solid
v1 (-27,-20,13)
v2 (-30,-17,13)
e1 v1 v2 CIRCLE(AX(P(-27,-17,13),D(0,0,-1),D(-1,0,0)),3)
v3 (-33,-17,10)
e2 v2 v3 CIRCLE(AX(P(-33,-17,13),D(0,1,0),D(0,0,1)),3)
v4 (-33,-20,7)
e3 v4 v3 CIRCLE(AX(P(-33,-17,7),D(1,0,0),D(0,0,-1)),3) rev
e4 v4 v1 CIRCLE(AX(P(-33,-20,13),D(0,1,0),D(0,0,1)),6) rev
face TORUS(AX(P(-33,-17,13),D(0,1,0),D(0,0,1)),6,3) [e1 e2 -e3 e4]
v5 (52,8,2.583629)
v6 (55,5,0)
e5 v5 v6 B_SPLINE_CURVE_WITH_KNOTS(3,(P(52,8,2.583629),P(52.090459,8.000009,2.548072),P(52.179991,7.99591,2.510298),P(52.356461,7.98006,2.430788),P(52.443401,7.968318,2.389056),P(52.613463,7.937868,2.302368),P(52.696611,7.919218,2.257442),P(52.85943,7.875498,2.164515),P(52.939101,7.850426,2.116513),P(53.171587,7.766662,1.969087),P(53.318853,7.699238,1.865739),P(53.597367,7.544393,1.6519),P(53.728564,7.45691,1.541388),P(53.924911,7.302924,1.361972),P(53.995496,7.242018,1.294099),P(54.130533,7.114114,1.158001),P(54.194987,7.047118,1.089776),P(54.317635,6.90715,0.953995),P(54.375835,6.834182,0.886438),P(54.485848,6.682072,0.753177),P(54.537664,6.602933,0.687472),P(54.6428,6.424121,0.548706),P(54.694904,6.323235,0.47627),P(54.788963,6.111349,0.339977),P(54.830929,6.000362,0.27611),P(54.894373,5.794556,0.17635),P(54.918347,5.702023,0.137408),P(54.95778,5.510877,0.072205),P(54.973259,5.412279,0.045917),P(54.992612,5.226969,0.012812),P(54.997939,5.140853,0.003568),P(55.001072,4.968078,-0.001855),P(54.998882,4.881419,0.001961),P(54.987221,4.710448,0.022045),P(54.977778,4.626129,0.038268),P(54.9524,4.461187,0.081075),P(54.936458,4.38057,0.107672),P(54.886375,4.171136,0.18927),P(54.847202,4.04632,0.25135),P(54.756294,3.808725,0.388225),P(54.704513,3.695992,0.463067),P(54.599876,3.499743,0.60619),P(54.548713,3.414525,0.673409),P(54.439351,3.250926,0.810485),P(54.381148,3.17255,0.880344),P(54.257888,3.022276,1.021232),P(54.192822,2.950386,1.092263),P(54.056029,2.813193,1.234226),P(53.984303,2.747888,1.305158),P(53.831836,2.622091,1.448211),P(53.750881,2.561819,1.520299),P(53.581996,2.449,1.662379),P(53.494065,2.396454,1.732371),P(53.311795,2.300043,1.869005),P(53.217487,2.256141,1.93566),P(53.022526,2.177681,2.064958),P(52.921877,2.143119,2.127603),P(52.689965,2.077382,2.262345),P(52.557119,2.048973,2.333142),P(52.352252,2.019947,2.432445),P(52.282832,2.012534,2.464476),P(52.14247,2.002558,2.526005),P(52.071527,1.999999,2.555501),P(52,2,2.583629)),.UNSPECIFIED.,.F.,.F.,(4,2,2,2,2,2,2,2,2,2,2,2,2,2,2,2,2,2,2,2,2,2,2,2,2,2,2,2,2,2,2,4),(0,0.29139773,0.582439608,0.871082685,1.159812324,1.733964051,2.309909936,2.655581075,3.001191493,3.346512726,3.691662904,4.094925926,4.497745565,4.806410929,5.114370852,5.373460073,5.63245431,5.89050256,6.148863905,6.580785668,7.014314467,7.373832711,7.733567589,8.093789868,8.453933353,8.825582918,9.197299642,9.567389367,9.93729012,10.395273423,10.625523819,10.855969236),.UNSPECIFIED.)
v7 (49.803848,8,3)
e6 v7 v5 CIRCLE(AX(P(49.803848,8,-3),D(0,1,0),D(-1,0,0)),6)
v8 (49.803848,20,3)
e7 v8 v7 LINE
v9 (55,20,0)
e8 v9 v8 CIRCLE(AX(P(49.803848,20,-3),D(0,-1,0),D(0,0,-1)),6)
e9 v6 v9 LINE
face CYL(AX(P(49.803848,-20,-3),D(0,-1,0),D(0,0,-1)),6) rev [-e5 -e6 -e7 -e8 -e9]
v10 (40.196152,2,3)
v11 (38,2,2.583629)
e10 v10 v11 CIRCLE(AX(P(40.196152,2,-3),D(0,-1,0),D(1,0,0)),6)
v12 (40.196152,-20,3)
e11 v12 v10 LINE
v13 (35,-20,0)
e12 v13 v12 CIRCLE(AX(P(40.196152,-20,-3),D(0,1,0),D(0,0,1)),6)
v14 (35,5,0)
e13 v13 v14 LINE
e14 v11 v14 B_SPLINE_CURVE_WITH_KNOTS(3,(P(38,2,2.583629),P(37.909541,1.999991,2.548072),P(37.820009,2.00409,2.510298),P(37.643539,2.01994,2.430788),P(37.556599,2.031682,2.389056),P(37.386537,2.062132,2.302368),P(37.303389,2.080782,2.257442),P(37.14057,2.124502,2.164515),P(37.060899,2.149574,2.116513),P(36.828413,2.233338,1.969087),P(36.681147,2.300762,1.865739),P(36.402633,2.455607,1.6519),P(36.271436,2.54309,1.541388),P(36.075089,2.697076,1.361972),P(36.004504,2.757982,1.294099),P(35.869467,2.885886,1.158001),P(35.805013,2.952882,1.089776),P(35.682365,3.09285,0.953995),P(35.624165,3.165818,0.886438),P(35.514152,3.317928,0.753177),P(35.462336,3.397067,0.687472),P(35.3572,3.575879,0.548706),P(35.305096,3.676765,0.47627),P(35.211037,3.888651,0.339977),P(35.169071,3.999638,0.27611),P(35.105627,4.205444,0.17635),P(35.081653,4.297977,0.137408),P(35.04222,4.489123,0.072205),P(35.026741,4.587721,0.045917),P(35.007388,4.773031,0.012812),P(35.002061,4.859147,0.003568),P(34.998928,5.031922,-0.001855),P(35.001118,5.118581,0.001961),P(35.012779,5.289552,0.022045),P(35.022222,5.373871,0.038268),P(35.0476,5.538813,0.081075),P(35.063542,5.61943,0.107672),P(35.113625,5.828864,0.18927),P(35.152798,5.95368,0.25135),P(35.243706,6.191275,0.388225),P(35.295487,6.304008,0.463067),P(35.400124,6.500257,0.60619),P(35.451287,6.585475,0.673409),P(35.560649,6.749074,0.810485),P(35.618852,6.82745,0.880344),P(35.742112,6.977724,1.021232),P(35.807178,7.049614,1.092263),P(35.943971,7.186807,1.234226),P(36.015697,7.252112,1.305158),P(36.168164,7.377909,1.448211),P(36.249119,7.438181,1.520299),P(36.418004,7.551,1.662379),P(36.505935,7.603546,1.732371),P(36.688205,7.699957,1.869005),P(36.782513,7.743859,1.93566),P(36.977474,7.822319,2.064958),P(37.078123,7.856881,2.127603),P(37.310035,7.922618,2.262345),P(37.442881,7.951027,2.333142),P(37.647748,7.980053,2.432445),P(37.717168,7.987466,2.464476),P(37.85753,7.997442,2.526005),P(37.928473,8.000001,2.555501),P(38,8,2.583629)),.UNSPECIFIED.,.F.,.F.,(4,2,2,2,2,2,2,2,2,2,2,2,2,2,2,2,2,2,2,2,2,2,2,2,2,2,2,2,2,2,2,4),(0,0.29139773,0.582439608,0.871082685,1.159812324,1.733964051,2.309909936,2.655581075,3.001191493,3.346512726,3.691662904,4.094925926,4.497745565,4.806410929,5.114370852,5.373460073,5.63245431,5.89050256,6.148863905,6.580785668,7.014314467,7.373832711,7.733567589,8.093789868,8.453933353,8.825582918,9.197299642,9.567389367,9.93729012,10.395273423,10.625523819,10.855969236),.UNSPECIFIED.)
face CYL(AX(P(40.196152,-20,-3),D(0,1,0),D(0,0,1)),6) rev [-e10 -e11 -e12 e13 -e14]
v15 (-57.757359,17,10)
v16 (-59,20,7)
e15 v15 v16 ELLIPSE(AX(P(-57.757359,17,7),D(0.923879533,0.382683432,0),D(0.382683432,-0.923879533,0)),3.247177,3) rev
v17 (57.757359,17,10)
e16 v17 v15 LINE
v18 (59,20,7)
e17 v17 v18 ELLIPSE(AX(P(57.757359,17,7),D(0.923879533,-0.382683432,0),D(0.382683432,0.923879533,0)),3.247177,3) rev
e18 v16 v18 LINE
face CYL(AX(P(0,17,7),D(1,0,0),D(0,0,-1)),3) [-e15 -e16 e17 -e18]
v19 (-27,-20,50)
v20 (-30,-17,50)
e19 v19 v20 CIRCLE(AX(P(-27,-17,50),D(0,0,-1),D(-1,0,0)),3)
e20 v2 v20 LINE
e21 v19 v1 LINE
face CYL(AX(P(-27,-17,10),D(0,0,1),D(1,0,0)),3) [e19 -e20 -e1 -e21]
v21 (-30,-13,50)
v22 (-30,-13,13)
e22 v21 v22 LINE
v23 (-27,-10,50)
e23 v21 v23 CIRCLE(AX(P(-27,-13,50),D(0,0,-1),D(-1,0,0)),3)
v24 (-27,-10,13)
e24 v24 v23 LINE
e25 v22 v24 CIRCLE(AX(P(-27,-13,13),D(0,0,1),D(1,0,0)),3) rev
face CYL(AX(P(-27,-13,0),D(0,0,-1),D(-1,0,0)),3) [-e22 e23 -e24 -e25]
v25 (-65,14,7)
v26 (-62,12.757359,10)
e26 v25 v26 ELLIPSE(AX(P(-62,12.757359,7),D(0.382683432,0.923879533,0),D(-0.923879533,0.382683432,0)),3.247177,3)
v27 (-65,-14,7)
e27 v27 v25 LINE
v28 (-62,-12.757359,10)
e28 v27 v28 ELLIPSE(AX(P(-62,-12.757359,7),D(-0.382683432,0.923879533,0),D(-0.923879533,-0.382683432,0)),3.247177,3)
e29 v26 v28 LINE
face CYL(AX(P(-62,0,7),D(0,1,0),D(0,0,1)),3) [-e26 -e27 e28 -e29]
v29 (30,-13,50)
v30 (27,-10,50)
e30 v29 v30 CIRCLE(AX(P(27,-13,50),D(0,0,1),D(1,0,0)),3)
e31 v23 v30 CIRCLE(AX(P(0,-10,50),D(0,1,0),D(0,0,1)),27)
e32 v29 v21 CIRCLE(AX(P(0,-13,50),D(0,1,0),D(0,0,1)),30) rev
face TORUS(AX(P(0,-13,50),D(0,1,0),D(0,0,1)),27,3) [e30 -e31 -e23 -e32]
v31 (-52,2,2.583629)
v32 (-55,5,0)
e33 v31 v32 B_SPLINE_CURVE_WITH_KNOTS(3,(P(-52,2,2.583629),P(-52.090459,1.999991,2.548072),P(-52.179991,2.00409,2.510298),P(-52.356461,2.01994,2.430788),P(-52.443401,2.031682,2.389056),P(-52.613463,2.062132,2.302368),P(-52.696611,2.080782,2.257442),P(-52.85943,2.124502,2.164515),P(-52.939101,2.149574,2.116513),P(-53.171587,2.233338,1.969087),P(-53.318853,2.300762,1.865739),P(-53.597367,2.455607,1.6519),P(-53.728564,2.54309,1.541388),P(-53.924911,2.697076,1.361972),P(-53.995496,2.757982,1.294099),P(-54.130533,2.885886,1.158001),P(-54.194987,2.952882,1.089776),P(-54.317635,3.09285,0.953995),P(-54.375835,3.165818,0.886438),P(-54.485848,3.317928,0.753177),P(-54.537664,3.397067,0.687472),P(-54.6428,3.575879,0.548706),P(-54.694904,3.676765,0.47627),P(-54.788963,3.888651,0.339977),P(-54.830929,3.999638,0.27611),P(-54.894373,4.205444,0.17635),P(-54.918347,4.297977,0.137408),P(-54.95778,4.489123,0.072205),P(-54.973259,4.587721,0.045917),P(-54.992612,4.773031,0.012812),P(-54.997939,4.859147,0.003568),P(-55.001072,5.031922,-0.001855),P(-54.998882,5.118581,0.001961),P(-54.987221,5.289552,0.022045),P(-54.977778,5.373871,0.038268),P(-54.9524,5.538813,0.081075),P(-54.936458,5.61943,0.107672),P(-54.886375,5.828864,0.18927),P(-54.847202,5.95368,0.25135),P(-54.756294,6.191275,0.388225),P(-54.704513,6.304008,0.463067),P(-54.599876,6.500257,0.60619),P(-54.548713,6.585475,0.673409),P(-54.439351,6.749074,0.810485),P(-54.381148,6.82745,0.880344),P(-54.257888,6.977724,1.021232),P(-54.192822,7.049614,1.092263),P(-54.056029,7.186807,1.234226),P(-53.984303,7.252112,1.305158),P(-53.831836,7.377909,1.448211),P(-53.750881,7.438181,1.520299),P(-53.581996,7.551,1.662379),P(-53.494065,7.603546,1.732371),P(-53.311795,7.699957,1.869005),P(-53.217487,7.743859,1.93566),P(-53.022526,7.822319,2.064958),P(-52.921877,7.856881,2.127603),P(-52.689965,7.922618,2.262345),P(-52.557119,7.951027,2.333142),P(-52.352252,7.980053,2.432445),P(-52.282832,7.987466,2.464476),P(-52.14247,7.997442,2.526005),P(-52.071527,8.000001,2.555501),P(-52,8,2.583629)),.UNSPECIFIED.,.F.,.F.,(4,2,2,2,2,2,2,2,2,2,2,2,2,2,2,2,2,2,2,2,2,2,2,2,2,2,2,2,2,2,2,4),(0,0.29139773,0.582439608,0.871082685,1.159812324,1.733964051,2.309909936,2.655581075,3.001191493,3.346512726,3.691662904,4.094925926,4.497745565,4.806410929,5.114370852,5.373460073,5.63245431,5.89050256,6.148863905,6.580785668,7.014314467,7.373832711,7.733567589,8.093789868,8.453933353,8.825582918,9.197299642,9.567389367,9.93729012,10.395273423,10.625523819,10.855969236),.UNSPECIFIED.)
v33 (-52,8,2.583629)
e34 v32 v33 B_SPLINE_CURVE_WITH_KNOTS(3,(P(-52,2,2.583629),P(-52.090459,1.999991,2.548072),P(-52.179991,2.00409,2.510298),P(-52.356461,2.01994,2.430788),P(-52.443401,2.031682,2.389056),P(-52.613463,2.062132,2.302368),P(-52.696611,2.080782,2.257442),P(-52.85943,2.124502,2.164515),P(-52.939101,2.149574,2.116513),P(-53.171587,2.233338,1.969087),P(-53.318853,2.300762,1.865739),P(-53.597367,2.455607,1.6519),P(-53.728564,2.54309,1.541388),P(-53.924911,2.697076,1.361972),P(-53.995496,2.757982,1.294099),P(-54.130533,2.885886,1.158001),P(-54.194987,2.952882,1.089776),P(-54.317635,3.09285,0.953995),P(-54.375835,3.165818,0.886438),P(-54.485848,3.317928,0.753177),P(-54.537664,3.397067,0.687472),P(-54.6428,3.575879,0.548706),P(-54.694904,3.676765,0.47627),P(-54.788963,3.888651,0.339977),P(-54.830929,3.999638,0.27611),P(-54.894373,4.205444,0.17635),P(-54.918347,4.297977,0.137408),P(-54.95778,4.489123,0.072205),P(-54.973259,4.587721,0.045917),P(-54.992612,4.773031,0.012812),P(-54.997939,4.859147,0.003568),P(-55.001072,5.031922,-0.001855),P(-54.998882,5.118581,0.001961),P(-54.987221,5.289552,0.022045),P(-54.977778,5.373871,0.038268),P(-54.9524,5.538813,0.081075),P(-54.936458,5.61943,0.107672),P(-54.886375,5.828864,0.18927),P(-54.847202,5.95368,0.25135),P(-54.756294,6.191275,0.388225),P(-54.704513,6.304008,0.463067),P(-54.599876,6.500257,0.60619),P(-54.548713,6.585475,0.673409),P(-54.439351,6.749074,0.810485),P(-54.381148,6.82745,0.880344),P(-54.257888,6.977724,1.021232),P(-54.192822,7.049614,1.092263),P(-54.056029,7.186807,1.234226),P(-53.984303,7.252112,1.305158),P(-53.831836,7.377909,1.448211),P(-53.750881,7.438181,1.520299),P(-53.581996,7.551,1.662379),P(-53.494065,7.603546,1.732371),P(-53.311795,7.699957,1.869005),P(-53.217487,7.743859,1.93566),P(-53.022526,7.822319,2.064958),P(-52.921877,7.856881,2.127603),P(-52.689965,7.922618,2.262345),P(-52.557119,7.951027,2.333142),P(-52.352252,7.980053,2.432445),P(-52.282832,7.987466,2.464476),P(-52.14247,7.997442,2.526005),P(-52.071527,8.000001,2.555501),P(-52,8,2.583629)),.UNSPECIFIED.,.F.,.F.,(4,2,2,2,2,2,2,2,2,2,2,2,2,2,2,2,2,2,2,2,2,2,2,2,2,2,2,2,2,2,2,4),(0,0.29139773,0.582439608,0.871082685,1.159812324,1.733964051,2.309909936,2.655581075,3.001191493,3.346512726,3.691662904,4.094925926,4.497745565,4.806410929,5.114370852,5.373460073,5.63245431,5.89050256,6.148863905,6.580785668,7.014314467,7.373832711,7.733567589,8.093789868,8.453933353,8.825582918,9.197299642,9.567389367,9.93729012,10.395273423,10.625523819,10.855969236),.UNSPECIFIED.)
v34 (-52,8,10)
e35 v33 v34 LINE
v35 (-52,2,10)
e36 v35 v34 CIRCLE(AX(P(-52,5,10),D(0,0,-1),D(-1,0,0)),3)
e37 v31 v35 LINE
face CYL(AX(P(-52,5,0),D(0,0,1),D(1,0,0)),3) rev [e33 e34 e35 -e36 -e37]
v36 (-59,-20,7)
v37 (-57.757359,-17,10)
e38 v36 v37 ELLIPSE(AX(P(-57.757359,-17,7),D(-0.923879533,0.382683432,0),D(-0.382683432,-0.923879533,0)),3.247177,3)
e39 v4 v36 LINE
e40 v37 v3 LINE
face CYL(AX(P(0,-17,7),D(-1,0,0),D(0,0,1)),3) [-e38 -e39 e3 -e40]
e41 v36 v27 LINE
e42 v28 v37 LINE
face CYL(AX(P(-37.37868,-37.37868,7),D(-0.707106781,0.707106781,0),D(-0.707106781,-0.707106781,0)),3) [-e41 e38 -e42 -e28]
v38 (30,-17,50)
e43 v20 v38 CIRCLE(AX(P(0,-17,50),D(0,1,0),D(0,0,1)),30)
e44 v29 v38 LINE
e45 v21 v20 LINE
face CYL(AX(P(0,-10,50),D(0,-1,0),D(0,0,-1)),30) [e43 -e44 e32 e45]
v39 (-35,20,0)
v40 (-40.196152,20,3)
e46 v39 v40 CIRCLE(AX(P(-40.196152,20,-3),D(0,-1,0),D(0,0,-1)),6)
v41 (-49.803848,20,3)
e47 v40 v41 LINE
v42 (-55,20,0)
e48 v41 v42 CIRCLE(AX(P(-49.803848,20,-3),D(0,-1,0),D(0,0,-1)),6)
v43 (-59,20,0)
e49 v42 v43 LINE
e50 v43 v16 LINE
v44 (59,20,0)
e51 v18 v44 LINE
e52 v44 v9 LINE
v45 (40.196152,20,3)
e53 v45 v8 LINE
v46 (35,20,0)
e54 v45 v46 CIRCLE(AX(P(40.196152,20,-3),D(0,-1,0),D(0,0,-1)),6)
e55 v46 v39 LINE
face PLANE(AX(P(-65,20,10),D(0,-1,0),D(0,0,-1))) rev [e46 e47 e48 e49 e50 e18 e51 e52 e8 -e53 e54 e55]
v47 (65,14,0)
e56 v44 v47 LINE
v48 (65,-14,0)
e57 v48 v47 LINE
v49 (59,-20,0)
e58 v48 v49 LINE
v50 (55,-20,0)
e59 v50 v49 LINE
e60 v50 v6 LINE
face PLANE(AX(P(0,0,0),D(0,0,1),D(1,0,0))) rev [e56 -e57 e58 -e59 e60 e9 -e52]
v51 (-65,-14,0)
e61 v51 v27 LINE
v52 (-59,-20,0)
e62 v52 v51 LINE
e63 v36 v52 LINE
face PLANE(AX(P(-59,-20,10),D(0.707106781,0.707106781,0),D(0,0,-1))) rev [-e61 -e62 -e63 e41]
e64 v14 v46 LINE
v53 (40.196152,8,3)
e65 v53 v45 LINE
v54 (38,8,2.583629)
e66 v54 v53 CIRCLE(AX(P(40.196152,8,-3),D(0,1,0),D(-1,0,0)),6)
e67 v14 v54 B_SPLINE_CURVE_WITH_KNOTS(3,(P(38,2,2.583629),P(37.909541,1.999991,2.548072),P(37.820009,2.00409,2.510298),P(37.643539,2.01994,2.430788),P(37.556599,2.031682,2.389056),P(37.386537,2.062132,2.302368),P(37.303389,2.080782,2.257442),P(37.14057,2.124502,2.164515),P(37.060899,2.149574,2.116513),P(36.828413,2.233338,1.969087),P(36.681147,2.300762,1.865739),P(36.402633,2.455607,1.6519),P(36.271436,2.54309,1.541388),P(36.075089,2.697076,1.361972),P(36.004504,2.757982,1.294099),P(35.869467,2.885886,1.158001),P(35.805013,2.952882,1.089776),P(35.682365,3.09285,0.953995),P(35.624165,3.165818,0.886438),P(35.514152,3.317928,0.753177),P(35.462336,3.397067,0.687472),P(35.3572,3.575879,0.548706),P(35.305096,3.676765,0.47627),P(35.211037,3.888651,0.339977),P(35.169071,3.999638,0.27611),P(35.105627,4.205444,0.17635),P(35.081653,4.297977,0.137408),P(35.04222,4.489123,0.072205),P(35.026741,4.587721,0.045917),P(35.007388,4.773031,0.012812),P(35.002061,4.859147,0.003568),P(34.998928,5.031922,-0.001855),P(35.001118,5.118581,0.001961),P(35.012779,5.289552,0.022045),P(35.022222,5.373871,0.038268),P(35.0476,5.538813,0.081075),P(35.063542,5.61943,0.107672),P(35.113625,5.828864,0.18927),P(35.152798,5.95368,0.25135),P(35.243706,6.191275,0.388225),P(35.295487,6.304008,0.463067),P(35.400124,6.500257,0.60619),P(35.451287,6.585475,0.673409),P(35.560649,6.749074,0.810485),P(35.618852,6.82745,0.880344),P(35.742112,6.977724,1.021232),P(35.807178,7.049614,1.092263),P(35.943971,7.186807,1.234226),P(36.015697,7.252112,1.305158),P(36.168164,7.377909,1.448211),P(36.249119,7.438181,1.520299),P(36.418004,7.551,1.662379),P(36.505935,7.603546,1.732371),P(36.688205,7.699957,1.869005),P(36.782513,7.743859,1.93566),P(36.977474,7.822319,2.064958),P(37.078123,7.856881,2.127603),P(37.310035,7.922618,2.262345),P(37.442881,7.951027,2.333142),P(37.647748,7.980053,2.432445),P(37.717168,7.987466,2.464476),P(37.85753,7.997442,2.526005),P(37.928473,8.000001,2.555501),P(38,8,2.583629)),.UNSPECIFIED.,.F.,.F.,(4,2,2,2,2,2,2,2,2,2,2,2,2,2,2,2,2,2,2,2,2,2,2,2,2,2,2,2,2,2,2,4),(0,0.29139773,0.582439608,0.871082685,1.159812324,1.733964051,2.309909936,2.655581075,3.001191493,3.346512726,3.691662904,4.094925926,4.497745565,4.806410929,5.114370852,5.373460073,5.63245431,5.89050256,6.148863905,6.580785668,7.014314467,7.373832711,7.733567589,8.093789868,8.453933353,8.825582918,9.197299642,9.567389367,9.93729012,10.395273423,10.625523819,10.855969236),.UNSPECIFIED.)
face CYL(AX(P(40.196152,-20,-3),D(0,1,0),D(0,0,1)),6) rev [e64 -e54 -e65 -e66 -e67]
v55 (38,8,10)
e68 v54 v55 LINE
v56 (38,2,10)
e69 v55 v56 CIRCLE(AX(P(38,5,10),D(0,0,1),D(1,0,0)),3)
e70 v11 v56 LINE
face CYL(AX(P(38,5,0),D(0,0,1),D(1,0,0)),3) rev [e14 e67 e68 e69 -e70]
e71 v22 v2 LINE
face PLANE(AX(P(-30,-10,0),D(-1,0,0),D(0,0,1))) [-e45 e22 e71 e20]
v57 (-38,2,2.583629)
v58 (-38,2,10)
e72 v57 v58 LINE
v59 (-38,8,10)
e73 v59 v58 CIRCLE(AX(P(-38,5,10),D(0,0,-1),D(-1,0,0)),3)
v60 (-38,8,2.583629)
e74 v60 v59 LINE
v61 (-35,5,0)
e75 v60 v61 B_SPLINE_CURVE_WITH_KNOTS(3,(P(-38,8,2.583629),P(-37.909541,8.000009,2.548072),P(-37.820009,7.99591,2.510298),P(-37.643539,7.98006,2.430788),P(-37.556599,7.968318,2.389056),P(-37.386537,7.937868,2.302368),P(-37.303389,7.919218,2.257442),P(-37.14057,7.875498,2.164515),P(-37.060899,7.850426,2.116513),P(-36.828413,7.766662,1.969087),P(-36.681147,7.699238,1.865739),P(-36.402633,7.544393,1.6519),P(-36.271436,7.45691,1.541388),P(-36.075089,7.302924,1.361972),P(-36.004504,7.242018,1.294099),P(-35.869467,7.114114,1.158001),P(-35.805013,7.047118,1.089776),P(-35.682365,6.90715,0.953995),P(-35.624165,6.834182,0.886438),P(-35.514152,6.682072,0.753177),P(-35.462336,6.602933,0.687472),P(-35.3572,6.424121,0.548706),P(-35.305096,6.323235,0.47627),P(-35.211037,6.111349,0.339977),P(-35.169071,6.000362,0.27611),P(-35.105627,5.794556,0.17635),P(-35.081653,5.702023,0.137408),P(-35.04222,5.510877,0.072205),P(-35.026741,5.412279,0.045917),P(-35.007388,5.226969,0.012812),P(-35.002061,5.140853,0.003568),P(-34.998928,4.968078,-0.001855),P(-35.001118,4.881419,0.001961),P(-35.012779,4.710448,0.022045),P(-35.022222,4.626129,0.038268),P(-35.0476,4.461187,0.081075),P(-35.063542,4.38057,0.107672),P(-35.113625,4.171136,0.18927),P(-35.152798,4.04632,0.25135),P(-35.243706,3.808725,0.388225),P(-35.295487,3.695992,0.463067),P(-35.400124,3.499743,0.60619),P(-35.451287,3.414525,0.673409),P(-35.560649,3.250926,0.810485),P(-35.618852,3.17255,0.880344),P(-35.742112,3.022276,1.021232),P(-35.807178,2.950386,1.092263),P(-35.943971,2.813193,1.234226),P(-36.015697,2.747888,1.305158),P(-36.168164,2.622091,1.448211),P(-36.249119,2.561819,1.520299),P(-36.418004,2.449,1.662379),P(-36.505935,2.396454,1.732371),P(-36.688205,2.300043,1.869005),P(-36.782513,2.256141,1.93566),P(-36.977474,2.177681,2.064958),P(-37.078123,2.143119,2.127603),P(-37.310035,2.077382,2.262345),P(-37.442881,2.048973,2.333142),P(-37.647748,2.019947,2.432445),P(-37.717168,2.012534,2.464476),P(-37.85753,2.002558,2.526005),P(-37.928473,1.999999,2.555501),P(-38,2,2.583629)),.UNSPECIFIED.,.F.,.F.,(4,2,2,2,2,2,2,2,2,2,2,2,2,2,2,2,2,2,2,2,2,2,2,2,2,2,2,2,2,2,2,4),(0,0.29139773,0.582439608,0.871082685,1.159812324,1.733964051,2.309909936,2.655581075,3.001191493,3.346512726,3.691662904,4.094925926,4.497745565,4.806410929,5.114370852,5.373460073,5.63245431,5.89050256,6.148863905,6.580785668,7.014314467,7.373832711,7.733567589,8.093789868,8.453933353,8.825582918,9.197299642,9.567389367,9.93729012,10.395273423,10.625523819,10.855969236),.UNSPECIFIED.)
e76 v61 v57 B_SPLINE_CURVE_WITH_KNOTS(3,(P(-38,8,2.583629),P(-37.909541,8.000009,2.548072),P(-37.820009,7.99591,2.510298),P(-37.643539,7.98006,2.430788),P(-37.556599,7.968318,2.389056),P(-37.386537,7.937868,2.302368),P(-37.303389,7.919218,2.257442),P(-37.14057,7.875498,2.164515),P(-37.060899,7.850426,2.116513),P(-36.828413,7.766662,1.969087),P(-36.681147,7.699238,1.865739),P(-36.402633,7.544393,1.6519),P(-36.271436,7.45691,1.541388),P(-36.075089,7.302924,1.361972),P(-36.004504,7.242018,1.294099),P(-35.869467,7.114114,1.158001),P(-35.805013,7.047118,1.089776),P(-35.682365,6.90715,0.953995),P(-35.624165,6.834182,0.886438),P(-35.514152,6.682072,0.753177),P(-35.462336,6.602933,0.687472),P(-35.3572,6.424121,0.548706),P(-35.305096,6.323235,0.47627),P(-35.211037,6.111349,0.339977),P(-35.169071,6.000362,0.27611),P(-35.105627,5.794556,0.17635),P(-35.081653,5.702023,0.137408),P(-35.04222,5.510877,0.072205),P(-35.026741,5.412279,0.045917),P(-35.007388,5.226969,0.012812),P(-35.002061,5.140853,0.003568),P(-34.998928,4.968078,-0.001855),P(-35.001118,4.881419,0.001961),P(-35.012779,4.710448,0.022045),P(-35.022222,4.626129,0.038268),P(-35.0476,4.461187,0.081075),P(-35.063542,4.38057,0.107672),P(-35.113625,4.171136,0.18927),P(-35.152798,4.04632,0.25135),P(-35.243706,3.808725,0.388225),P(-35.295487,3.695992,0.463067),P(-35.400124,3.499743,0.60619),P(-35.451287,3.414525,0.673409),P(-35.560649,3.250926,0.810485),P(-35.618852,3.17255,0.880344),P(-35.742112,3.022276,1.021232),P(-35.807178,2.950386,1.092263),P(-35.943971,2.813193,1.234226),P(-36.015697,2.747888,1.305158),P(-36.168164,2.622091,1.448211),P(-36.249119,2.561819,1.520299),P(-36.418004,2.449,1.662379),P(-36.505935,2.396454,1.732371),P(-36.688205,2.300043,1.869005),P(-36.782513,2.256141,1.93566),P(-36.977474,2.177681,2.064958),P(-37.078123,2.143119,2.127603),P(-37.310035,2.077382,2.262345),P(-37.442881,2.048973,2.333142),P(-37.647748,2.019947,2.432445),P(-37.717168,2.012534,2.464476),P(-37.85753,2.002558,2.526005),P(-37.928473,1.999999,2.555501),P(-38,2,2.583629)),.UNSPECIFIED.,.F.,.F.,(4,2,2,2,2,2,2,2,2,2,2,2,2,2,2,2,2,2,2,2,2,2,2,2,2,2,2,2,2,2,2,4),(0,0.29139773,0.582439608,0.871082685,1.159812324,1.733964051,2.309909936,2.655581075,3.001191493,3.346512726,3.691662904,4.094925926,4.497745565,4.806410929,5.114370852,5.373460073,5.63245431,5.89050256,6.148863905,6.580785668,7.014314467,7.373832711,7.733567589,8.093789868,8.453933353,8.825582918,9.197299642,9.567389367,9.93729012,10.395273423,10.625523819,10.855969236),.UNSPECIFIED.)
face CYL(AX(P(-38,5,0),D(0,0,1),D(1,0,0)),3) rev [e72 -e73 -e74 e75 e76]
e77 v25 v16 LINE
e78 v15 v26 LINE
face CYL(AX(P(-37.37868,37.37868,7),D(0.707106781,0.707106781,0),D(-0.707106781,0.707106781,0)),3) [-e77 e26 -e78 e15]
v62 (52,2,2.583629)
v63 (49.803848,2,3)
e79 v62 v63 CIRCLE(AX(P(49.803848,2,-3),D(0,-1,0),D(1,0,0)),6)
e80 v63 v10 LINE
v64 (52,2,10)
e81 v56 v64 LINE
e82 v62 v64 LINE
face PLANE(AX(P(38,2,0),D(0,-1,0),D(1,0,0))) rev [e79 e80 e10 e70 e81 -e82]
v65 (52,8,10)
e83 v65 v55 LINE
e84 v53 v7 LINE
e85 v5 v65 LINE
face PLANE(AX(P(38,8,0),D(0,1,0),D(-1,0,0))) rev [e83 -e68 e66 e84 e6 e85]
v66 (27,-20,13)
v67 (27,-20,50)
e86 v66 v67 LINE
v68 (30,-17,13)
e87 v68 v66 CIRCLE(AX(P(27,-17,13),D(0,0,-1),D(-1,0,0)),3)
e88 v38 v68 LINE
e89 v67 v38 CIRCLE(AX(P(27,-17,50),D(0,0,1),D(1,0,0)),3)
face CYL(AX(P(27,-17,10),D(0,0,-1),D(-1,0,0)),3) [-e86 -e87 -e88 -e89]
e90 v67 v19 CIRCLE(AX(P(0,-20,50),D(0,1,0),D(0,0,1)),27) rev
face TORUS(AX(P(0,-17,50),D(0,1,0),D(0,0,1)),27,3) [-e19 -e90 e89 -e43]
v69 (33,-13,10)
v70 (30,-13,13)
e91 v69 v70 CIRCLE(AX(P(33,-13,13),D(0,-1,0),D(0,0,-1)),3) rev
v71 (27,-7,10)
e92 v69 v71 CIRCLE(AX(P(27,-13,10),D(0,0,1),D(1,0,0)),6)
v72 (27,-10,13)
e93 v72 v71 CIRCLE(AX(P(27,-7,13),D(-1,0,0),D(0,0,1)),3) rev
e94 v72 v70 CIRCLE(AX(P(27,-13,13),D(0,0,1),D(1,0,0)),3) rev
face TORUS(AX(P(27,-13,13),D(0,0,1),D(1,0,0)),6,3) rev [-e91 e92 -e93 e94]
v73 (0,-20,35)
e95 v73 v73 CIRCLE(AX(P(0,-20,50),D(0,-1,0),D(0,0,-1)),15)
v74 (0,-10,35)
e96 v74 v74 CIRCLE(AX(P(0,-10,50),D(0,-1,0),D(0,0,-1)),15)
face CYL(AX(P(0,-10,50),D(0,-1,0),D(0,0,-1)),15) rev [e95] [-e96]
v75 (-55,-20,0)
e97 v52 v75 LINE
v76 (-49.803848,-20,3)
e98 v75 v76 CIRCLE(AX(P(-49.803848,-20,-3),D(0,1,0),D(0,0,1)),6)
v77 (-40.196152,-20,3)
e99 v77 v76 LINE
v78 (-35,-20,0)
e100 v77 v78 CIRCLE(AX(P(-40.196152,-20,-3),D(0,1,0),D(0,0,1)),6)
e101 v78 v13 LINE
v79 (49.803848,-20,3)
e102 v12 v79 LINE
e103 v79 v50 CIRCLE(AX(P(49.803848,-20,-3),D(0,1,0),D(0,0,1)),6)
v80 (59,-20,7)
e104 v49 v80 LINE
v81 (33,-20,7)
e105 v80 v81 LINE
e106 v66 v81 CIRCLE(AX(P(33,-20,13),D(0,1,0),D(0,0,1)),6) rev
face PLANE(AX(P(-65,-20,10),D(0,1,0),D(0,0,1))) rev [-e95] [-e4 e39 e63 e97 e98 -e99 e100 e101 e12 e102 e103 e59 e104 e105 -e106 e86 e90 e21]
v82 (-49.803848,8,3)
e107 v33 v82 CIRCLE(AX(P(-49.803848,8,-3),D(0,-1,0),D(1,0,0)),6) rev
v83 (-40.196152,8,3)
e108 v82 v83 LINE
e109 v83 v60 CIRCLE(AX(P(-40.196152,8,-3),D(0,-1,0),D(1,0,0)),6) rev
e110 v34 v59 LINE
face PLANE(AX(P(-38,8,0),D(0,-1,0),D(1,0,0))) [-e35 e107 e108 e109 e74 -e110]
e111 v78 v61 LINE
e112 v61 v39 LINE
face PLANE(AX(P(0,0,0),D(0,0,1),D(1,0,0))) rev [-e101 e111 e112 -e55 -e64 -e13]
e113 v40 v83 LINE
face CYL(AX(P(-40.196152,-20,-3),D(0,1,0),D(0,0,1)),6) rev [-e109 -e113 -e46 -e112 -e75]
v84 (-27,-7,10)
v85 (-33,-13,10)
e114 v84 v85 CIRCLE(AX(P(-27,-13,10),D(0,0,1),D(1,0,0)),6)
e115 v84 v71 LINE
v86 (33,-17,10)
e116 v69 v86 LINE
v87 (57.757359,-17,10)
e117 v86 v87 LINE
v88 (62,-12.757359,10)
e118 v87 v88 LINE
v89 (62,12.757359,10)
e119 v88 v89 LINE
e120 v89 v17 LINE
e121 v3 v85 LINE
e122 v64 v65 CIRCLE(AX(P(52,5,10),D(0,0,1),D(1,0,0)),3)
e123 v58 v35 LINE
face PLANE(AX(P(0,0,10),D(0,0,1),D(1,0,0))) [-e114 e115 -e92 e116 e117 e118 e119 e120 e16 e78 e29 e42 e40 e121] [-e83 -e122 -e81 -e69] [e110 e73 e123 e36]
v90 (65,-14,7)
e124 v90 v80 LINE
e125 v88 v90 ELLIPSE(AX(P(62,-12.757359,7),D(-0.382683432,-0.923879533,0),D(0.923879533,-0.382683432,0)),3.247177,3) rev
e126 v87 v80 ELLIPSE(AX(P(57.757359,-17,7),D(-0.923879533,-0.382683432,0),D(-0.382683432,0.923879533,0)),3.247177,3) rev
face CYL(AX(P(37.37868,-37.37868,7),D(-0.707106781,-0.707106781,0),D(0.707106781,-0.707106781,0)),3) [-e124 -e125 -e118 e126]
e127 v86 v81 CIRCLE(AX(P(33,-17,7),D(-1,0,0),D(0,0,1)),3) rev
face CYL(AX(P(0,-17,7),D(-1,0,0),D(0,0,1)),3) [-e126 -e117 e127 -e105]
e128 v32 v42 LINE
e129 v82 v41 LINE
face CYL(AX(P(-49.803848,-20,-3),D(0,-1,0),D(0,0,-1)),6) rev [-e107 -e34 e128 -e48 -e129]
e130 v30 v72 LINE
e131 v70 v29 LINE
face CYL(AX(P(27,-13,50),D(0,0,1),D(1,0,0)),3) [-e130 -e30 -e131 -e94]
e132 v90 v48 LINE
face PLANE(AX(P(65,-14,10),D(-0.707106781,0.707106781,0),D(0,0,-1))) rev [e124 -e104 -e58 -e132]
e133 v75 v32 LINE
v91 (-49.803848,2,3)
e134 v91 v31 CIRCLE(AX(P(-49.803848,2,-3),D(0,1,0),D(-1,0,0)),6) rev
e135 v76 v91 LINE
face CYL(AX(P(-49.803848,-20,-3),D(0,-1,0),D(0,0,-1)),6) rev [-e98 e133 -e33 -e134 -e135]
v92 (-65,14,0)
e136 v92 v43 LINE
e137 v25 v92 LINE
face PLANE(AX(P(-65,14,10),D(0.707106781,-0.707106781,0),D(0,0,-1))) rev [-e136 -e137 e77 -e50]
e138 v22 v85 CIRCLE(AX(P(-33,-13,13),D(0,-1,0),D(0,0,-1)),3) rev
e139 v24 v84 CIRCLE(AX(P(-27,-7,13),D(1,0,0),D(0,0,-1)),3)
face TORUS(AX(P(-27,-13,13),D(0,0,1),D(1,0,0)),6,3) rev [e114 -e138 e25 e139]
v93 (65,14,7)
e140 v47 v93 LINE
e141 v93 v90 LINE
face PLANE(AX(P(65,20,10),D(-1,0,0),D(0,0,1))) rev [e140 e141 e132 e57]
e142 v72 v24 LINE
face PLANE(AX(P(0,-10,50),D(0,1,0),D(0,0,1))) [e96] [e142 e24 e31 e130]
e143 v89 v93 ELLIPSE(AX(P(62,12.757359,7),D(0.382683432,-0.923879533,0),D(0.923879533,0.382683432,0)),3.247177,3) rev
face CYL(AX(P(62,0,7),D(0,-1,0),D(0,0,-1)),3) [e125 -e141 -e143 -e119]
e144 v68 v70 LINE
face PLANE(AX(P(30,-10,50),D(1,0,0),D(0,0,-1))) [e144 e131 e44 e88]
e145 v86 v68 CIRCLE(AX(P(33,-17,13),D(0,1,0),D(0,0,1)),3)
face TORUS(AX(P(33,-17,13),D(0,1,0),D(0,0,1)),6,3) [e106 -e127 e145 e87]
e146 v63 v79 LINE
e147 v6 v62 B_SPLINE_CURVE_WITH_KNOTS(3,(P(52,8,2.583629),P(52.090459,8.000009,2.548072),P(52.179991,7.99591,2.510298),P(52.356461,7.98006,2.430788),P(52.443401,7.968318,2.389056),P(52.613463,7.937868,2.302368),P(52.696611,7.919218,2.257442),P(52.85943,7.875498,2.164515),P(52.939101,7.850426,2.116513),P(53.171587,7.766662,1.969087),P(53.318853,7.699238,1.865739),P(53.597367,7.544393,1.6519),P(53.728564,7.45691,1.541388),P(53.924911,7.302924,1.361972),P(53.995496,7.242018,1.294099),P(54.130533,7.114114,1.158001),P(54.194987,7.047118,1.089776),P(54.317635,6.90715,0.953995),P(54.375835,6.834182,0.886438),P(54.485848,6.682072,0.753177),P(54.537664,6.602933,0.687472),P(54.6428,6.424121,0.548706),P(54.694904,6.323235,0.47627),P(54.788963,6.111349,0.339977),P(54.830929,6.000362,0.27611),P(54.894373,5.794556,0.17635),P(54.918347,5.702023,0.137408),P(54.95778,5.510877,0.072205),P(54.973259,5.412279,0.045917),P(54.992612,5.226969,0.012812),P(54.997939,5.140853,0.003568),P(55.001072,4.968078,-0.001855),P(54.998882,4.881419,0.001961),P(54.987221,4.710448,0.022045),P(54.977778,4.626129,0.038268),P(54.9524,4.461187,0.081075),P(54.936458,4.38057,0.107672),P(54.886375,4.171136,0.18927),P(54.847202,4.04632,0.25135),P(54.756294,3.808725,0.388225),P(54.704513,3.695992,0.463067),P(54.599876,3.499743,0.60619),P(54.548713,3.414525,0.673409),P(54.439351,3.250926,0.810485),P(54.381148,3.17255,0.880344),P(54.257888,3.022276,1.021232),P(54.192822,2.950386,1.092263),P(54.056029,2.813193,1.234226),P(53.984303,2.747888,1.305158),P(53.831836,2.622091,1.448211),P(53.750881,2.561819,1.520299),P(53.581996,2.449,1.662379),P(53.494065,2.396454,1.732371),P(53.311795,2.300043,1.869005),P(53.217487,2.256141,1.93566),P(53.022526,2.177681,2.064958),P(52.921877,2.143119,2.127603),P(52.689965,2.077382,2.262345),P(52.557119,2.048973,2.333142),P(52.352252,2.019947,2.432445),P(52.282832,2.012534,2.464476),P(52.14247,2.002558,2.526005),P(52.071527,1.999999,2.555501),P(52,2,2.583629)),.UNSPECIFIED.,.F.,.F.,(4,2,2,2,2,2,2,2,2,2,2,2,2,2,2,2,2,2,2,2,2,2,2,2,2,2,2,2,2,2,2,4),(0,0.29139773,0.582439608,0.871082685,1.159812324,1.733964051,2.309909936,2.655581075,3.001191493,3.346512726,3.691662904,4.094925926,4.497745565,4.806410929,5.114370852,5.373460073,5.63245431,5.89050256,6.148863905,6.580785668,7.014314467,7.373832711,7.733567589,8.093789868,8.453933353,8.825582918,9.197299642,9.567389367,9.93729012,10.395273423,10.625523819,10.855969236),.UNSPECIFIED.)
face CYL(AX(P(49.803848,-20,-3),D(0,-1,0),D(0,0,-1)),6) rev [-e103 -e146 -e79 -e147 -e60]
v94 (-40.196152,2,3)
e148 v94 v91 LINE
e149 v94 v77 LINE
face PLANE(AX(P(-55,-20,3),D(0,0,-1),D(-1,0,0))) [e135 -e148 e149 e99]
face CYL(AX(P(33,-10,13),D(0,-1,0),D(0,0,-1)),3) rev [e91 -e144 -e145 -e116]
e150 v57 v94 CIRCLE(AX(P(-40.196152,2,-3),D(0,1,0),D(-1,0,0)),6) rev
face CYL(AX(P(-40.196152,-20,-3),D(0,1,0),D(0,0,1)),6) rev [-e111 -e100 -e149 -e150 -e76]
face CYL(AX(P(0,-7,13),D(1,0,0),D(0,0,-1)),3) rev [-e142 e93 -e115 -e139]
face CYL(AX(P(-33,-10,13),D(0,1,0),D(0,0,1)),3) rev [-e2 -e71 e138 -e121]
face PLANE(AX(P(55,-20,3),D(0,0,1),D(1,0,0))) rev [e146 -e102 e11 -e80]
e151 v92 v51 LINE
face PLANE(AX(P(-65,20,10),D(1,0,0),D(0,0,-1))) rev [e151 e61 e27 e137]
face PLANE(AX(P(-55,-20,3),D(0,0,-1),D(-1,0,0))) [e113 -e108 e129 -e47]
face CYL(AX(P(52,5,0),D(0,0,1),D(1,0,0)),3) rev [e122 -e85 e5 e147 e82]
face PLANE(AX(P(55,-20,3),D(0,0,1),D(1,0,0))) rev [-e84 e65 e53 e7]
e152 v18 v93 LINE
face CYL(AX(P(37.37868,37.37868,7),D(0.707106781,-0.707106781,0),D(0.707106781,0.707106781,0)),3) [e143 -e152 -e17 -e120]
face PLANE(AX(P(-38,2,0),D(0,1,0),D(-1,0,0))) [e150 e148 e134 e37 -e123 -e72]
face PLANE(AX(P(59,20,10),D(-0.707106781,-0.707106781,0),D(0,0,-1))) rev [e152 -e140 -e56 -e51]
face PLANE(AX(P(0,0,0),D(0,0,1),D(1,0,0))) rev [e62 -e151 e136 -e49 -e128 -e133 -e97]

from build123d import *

# Parameters (mm, degrees)
ESQUISSE1_W             = 130
ESQUISSE1_H             = 40
BOSS_EXTRU_1_DEPTH      = 10
ESQUISSE2_R             = 15
BOSS_EXTRU_2_DEPTH      = 10
ENL_V_MAT_EXTRU_1_DEPTH = 98.59610648
ESQUISSE4_W             = 20
ESQUISSE4_H             = 3
ENL_V_MAT_EXTRU_2_DEPTH = 111.566721937
CONG_5_START            = -20
CONG_5_DEPTH            = 40
CONG_5_START_2          = -4.421e-06
CONG_5_2_DEPTH          = 3.000004421
CHANFREIN1_SIZE         = 6
CONG_6_R                = 3


with BuildPart() as part:
    # Esquisse1 → Boss.-Extru.1 (new body)
    with BuildSketch(Plane.XY):
        Rectangle(ESQUISSE1_W, ESQUISSE1_H)
    extrude(amount=BOSS_EXTRU_1_DEPTH)

    # Esquisse2 → Boss.-Extru.2 (add)
    with BuildSketch(Plane.XZ.offset(20)):
        with BuildLine():
            Line((-30, 0), (-30, 50))
            ThreePointArc((-30, 50), (0, 80), (30, 50))
            Line((30, 50), (30, 0))
            Line((30, 0), (-30, 0))
        make_face()
        with Locations(Location((0, 50, 0), (0, 0, 270))):
            Circle(ESQUISSE2_R, mode=Mode.SUBTRACT)
    extrude(amount=-BOSS_EXTRU_2_DEPTH)

    # Esquisse3 → Enlèv. mat.-Extru.1 (cut, through all)
    with BuildSketch(Plane.XY.offset(10)):
        with BuildLine():
            Line((38, 8), (52, 8))
            ThreePointArc((52, 8), (55, 5), (52, 2))
            Line((52, 2), (38, 2))
            ThreePointArc((38, 2), (35, 5), (38, 8))
        make_face()
    enl_v_mat_extru_1 = extrude(amount=-ENL_V_MAT_EXTRU_1_DEPTH, mode=Mode.SUBTRACT)

    # Symétrie1: Enlèv. mat.-Extru.1 across plane
    add(enl_v_mat_extru_1.mirror(Plane(origin=(0, 0, 0), x_dir=(0, 0, 1), z_dir=(1, 0, 0))), mode=Mode.SUBTRACT)

    # Esquisse4 → Enlèv. mat.-Extru.2 (cut, through all)
    with BuildSketch(Plane(origin=(0, 20, 0), x_dir=(1, 0, 0), z_dir=(0, 1, 0))):
        with Locations((45, -1.5)):
            Rectangle(ESQUISSE4_W, ESQUISSE4_H)
    enl_v_mat_extru_2 = extrude(amount=-ENL_V_MAT_EXTRU_2_DEPTH, mode=Mode.SUBTRACT)

    # Congé5: read off the stored shape, not the designer's step
    # Congé5 outline → Congé5 (add)
    with BuildSketch(Plane(origin=(0, 0, 0), x_dir=(1, 0, 0), z_dir=(0, 1, 0)).offset(CONG_5_START)):
        with BuildLine():
            Line((55, -3), (55.000002552, 4.421e-06))
            ThreePointArc((55.000002552, 4.421e-06), (52.803849788, -2.196151147), (49.803847577, -3))
            Line((49.803847577, -3), (55, -3))
        make_face()
        with BuildLine():
            Line((35, -3), (40.196152423, -3))
            ThreePointArc((40.196152423, -3), (37.196152423, -2.196152423), (35, 0))
            Line((35, 0), (35, -3))
        make_face()
    cong_5 = extrude(amount=CONG_5_DEPTH)

    # Cong_5 2 outline → Cong_5 2 (cut)
    with BuildSketch(Plane.XY.offset(CONG_5_START_2)):
        with BuildLine():
            Line((52, 8), (38, 8))
            ThreePointArc((38, 8), (35, 5), (38, 2))
            Line((38, 2), (52, 2))
            ThreePointArc((52, 2), (55, 5), (52, 8))
        make_face()
    cong_5_2 = extrude(amount=CONG_5_2_DEPTH, mode=Mode.SUBTRACT)

    # Symétrie2: Enlèv. mat.-Extru.2, Congé5, Cong_5 2 across plane
    add(enl_v_mat_extru_2.mirror(Plane(origin=(0, 0, 0), x_dir=(0, 0, 1), z_dir=(1, 0, 0))), mode=Mode.SUBTRACT)
    add(cong_5.mirror(Plane(origin=(0, 0, 0), x_dir=(0, 0, 1), z_dir=(1, 0, 0))))
    add(cong_5_2.mirror(Plane(origin=(0, 0, 0), x_dir=(0, 0, 1), z_dir=(1, 0, 0))), mode=Mode.SUBTRACT)

    # Chanfrein1
    chanfrein1_edges = [part.edges().sort_by_distance(p)[0] for p in [
        (65, -20, 5),
        (-65, -20, 5),
        (-65, 20, 5),
        (65, 20, 5),
    ]]
    chamfer(chanfrein1_edges, length=CHANFREIN1_SIZE)

    # Congé6
    cong_6_edges = [part.edges().sort_by_distance(p)[0] for p in [
        (44.5, -20, 10),
        (65, 0, 10),
        (-44.5, -20, 10),
        (0, 20, 10),
        (-65, 0, 10),
        (-62, 17, 10),
        (62, 17, 10),
        (-62, -17, 10),
        (62, -17, 10),
        (-30, -10, 30),
        (-30, -15, 10),
        (0, -10, 80),
        (30, -15, 10),
        (30, -10, 30),
        (0, -10, 10),
        (30, -20, 30),
        (0, -20, 80),
        (-30, -20, 30),
    ]]
    fillet(cong_6_edges, radius=CONG_6_R)


solid = part.part
